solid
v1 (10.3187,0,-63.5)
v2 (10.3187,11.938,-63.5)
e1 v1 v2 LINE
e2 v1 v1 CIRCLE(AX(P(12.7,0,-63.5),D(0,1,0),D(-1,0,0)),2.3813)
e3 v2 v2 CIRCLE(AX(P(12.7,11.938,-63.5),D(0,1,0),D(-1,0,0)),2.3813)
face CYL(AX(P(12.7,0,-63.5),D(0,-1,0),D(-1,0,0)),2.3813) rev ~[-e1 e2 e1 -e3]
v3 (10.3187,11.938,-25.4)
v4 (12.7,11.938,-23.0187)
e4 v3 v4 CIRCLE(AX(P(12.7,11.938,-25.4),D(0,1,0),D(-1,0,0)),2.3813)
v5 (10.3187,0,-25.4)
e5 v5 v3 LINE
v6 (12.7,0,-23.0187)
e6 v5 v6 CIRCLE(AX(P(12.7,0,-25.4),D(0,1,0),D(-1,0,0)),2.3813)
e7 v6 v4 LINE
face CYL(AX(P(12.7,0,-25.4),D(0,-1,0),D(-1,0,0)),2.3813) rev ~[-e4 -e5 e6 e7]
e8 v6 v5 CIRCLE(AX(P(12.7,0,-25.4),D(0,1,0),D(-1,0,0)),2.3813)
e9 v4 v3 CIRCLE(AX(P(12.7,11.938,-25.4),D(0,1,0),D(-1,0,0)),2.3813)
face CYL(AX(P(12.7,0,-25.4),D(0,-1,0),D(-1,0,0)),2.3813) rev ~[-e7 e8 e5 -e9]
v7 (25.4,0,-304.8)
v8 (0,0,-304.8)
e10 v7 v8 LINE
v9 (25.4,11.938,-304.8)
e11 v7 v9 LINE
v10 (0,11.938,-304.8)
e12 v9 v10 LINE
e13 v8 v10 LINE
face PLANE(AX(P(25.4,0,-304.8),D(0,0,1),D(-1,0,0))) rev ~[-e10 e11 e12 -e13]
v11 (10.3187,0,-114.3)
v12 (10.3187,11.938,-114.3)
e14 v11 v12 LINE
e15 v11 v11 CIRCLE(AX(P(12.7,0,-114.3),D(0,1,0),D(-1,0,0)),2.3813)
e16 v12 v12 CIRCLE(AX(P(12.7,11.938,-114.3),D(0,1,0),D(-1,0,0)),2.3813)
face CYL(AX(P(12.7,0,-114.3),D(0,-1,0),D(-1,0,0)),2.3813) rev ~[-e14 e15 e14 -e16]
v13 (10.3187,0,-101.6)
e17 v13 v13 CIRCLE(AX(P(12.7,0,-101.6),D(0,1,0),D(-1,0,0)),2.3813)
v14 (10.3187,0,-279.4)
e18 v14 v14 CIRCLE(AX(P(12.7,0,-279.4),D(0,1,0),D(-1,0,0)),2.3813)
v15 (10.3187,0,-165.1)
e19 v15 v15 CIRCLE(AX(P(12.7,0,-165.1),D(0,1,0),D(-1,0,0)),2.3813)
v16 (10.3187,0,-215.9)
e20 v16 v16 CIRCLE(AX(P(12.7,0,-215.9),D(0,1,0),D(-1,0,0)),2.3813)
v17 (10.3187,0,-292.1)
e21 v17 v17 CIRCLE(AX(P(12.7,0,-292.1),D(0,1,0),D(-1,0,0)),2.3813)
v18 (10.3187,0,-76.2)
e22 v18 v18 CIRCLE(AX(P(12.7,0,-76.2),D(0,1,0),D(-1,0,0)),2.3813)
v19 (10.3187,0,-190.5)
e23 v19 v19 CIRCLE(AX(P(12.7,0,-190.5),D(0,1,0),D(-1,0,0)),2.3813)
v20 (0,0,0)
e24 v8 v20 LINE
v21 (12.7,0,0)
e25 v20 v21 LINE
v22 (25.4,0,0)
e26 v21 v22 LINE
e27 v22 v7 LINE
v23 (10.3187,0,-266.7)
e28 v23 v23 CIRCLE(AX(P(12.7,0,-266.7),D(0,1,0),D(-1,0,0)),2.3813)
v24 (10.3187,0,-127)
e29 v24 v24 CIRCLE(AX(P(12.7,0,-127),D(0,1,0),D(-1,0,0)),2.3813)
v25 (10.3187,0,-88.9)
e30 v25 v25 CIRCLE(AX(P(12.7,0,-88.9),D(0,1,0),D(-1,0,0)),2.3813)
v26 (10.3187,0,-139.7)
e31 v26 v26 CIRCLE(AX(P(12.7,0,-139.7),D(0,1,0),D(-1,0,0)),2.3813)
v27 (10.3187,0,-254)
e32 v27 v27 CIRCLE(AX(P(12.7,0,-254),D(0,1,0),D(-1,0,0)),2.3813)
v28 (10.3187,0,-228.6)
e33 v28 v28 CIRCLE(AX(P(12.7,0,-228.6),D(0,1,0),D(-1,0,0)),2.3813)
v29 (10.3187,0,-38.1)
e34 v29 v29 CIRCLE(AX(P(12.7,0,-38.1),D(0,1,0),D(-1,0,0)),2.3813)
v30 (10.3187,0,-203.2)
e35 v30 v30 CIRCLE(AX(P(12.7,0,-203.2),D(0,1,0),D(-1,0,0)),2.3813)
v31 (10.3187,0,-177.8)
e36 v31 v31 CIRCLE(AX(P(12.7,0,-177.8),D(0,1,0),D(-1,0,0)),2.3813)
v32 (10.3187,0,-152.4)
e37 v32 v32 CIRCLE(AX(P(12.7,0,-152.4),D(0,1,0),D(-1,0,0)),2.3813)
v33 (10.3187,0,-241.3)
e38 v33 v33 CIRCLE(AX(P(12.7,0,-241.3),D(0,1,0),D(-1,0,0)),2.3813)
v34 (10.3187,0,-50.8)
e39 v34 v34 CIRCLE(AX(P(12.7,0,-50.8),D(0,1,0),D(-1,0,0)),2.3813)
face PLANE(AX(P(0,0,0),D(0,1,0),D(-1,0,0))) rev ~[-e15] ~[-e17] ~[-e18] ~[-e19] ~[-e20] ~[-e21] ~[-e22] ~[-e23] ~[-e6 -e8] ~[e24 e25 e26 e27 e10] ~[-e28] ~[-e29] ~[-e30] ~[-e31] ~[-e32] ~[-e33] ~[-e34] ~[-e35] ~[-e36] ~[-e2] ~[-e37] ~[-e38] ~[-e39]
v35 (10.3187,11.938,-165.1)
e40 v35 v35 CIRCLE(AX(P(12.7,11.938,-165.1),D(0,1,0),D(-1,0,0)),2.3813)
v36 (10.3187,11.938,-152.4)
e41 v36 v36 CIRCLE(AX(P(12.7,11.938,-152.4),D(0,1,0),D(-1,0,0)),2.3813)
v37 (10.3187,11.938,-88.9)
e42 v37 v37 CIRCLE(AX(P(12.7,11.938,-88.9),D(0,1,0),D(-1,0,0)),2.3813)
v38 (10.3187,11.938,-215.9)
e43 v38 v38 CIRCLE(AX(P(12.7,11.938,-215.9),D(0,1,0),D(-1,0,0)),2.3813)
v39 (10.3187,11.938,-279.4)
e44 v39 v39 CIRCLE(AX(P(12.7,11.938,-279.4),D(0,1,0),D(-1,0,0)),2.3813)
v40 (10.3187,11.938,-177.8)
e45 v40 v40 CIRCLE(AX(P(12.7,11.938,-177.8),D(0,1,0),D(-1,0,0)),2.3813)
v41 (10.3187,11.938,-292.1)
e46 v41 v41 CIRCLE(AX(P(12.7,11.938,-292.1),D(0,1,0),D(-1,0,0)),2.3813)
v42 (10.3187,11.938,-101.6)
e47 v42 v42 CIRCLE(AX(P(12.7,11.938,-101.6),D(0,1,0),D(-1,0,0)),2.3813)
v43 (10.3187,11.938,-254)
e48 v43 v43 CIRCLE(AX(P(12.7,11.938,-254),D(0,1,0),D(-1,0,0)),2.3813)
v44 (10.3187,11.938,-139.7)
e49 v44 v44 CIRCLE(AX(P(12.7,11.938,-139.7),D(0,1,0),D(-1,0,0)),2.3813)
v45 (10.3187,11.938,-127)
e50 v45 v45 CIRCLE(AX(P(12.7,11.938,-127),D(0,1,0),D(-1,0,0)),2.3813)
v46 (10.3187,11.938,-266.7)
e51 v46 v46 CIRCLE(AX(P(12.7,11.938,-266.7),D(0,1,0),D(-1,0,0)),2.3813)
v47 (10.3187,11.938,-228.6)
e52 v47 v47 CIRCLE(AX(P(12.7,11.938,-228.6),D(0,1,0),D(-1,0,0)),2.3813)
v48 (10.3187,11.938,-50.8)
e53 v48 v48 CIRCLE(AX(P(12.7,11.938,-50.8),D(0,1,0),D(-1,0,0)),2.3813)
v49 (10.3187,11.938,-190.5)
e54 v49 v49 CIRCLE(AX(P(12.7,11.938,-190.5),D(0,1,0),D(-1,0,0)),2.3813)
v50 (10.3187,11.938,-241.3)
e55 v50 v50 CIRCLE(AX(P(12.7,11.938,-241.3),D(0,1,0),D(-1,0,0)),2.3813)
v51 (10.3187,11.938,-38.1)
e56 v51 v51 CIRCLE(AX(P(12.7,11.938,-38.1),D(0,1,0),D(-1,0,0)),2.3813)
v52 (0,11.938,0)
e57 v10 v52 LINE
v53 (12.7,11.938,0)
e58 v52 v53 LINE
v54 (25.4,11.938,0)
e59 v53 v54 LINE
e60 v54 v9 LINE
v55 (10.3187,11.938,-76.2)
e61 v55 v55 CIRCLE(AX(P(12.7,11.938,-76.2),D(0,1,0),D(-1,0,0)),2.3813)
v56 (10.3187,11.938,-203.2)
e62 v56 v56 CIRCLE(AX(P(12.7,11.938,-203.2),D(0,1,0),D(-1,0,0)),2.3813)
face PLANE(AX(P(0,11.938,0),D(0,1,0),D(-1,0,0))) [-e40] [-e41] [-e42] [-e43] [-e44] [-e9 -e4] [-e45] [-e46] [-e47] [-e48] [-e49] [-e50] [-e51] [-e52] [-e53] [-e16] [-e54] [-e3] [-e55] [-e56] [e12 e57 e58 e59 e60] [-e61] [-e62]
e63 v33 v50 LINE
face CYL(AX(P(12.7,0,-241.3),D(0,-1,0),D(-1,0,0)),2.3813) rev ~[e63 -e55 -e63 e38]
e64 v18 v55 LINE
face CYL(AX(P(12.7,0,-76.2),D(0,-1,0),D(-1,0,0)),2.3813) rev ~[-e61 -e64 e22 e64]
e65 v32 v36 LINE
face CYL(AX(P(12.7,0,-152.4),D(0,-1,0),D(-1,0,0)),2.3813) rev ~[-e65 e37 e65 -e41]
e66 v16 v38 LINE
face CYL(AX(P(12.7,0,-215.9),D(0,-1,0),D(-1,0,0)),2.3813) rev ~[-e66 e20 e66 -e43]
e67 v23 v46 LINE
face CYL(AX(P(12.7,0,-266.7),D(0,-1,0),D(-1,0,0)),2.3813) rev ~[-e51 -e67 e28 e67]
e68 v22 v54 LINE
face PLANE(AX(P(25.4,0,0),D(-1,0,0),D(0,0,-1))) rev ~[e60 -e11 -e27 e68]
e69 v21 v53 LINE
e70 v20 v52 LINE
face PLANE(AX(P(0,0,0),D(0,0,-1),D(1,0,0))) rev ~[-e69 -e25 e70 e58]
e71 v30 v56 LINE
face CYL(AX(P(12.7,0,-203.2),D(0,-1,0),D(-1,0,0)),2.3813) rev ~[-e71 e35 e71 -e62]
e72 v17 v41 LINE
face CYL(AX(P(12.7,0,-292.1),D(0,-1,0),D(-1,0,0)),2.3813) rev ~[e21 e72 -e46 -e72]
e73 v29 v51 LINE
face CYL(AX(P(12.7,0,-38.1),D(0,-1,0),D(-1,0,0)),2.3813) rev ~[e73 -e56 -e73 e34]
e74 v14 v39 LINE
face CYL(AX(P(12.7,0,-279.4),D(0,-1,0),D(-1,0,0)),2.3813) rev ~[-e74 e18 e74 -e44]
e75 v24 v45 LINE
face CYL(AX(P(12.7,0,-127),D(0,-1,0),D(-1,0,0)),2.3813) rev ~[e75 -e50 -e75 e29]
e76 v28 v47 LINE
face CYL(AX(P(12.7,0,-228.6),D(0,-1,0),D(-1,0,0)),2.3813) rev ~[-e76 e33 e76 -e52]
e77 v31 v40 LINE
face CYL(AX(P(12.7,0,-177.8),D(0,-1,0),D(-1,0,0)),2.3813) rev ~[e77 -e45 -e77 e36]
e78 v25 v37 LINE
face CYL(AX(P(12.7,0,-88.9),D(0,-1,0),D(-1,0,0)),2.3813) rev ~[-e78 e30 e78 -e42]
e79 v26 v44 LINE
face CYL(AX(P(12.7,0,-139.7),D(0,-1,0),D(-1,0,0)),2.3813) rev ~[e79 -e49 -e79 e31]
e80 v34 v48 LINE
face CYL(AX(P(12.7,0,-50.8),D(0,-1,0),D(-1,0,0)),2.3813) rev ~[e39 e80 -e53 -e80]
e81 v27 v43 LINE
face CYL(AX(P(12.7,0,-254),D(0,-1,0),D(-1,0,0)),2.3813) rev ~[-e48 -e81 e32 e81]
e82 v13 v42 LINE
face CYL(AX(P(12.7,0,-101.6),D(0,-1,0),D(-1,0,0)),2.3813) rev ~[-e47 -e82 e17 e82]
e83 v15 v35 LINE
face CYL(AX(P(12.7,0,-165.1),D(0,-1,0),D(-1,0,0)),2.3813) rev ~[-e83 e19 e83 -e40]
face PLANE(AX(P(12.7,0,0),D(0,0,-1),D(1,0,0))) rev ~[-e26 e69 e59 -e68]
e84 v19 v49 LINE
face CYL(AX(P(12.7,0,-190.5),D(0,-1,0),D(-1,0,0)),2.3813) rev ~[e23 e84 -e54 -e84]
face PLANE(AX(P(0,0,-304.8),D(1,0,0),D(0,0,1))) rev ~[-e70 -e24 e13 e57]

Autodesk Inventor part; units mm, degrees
ref_plane "YZ Plane" through (0, 0, 0) normal (1, 0, 0) x (0, 1, 0)
ref_plane "XZ Plane" through (0, 0, 0) normal (0, 1, 0) x (-1, 0, 0)
ref_plane "XY Plane" through (0, 0, 0) normal (0, 0, 1) x (1, 0, 0)
sketch "Sketch1" plane through (0, 0, 0) normal (0, 1, 0) x (-1, 0, 0)
  line L0 (0, 0) -> (-25.4, 0)
  line L1 (-25.4, 0) -> (-25.4, -304.8)
  line L2 (-25.4, -304.8) -> (0, -304.8)
  line L3 (0, -304.8) -> (0, 0)
  line L4 (-12.7, 0) -> (-12.7, -304.8) construction
  line L5 (-12.7, 0) -> (-12.7, -25.4)
  line L6 (-12.7, 0) -> (12.7, 0) construction
  circle A0 centre (-12.7, -25.4) radius 2.3813
  circle A1 centre (-12.7, -38.1) radius 2.3813
  circle A2 centre (-12.7, -50.8) radius 2.3813
  circle A3 centre (-12.7, -63.5) radius 2.3813
  circle A4 centre (-12.7, -76.2) radius 2.3813
  circle A5 centre (-12.7, -88.9) radius 2.3813
  circle A6 centre (-12.7, -101.6) radius 2.3813
  circle A7 centre (-12.7, -114.3) radius 2.3813
  circle A8 centre (-12.7, -127) radius 2.3813
  circle A9 centre (-12.7, -139.7) radius 2.3813
  circle A10 centre (-12.7, -152.4) radius 2.3813
  circle A11 centre (-12.7, -165.1) radius 2.3813
  circle A12 centre (-12.7, -177.8) radius 2.3813
  circle A13 centre (-12.7, -190.5) radius 2.3813
  circle A14 centre (-12.7, -203.2) radius 2.3813
  circle A15 centre (-12.7, -215.9) radius 2.3813
  circle A16 centre (-12.7, -228.6) radius 2.3813
  circle A17 centre (-12.7, -241.3) radius 2.3813
  circle A18 centre (-12.7, -254) radius 2.3813
  circle A19 centre (-12.7, -266.7) radius 2.3813
  circle A20 centre (-12.7, -279.4) radius 2.3813
  circle A21 centre (-12.7, -292.1) radius 2.3813
  dimension "d0" = 25.4
  dimension "d1" = 304.8
  dimension "d2" = 25.4
  dimension "d3" = 90
  dimension "d4" = 4.7625
  dimension "d16" = 12.7
extrude "Extrusion2" add sketch "Sketch1" along normal blind 11.938
properties part number "pincer2.0"
